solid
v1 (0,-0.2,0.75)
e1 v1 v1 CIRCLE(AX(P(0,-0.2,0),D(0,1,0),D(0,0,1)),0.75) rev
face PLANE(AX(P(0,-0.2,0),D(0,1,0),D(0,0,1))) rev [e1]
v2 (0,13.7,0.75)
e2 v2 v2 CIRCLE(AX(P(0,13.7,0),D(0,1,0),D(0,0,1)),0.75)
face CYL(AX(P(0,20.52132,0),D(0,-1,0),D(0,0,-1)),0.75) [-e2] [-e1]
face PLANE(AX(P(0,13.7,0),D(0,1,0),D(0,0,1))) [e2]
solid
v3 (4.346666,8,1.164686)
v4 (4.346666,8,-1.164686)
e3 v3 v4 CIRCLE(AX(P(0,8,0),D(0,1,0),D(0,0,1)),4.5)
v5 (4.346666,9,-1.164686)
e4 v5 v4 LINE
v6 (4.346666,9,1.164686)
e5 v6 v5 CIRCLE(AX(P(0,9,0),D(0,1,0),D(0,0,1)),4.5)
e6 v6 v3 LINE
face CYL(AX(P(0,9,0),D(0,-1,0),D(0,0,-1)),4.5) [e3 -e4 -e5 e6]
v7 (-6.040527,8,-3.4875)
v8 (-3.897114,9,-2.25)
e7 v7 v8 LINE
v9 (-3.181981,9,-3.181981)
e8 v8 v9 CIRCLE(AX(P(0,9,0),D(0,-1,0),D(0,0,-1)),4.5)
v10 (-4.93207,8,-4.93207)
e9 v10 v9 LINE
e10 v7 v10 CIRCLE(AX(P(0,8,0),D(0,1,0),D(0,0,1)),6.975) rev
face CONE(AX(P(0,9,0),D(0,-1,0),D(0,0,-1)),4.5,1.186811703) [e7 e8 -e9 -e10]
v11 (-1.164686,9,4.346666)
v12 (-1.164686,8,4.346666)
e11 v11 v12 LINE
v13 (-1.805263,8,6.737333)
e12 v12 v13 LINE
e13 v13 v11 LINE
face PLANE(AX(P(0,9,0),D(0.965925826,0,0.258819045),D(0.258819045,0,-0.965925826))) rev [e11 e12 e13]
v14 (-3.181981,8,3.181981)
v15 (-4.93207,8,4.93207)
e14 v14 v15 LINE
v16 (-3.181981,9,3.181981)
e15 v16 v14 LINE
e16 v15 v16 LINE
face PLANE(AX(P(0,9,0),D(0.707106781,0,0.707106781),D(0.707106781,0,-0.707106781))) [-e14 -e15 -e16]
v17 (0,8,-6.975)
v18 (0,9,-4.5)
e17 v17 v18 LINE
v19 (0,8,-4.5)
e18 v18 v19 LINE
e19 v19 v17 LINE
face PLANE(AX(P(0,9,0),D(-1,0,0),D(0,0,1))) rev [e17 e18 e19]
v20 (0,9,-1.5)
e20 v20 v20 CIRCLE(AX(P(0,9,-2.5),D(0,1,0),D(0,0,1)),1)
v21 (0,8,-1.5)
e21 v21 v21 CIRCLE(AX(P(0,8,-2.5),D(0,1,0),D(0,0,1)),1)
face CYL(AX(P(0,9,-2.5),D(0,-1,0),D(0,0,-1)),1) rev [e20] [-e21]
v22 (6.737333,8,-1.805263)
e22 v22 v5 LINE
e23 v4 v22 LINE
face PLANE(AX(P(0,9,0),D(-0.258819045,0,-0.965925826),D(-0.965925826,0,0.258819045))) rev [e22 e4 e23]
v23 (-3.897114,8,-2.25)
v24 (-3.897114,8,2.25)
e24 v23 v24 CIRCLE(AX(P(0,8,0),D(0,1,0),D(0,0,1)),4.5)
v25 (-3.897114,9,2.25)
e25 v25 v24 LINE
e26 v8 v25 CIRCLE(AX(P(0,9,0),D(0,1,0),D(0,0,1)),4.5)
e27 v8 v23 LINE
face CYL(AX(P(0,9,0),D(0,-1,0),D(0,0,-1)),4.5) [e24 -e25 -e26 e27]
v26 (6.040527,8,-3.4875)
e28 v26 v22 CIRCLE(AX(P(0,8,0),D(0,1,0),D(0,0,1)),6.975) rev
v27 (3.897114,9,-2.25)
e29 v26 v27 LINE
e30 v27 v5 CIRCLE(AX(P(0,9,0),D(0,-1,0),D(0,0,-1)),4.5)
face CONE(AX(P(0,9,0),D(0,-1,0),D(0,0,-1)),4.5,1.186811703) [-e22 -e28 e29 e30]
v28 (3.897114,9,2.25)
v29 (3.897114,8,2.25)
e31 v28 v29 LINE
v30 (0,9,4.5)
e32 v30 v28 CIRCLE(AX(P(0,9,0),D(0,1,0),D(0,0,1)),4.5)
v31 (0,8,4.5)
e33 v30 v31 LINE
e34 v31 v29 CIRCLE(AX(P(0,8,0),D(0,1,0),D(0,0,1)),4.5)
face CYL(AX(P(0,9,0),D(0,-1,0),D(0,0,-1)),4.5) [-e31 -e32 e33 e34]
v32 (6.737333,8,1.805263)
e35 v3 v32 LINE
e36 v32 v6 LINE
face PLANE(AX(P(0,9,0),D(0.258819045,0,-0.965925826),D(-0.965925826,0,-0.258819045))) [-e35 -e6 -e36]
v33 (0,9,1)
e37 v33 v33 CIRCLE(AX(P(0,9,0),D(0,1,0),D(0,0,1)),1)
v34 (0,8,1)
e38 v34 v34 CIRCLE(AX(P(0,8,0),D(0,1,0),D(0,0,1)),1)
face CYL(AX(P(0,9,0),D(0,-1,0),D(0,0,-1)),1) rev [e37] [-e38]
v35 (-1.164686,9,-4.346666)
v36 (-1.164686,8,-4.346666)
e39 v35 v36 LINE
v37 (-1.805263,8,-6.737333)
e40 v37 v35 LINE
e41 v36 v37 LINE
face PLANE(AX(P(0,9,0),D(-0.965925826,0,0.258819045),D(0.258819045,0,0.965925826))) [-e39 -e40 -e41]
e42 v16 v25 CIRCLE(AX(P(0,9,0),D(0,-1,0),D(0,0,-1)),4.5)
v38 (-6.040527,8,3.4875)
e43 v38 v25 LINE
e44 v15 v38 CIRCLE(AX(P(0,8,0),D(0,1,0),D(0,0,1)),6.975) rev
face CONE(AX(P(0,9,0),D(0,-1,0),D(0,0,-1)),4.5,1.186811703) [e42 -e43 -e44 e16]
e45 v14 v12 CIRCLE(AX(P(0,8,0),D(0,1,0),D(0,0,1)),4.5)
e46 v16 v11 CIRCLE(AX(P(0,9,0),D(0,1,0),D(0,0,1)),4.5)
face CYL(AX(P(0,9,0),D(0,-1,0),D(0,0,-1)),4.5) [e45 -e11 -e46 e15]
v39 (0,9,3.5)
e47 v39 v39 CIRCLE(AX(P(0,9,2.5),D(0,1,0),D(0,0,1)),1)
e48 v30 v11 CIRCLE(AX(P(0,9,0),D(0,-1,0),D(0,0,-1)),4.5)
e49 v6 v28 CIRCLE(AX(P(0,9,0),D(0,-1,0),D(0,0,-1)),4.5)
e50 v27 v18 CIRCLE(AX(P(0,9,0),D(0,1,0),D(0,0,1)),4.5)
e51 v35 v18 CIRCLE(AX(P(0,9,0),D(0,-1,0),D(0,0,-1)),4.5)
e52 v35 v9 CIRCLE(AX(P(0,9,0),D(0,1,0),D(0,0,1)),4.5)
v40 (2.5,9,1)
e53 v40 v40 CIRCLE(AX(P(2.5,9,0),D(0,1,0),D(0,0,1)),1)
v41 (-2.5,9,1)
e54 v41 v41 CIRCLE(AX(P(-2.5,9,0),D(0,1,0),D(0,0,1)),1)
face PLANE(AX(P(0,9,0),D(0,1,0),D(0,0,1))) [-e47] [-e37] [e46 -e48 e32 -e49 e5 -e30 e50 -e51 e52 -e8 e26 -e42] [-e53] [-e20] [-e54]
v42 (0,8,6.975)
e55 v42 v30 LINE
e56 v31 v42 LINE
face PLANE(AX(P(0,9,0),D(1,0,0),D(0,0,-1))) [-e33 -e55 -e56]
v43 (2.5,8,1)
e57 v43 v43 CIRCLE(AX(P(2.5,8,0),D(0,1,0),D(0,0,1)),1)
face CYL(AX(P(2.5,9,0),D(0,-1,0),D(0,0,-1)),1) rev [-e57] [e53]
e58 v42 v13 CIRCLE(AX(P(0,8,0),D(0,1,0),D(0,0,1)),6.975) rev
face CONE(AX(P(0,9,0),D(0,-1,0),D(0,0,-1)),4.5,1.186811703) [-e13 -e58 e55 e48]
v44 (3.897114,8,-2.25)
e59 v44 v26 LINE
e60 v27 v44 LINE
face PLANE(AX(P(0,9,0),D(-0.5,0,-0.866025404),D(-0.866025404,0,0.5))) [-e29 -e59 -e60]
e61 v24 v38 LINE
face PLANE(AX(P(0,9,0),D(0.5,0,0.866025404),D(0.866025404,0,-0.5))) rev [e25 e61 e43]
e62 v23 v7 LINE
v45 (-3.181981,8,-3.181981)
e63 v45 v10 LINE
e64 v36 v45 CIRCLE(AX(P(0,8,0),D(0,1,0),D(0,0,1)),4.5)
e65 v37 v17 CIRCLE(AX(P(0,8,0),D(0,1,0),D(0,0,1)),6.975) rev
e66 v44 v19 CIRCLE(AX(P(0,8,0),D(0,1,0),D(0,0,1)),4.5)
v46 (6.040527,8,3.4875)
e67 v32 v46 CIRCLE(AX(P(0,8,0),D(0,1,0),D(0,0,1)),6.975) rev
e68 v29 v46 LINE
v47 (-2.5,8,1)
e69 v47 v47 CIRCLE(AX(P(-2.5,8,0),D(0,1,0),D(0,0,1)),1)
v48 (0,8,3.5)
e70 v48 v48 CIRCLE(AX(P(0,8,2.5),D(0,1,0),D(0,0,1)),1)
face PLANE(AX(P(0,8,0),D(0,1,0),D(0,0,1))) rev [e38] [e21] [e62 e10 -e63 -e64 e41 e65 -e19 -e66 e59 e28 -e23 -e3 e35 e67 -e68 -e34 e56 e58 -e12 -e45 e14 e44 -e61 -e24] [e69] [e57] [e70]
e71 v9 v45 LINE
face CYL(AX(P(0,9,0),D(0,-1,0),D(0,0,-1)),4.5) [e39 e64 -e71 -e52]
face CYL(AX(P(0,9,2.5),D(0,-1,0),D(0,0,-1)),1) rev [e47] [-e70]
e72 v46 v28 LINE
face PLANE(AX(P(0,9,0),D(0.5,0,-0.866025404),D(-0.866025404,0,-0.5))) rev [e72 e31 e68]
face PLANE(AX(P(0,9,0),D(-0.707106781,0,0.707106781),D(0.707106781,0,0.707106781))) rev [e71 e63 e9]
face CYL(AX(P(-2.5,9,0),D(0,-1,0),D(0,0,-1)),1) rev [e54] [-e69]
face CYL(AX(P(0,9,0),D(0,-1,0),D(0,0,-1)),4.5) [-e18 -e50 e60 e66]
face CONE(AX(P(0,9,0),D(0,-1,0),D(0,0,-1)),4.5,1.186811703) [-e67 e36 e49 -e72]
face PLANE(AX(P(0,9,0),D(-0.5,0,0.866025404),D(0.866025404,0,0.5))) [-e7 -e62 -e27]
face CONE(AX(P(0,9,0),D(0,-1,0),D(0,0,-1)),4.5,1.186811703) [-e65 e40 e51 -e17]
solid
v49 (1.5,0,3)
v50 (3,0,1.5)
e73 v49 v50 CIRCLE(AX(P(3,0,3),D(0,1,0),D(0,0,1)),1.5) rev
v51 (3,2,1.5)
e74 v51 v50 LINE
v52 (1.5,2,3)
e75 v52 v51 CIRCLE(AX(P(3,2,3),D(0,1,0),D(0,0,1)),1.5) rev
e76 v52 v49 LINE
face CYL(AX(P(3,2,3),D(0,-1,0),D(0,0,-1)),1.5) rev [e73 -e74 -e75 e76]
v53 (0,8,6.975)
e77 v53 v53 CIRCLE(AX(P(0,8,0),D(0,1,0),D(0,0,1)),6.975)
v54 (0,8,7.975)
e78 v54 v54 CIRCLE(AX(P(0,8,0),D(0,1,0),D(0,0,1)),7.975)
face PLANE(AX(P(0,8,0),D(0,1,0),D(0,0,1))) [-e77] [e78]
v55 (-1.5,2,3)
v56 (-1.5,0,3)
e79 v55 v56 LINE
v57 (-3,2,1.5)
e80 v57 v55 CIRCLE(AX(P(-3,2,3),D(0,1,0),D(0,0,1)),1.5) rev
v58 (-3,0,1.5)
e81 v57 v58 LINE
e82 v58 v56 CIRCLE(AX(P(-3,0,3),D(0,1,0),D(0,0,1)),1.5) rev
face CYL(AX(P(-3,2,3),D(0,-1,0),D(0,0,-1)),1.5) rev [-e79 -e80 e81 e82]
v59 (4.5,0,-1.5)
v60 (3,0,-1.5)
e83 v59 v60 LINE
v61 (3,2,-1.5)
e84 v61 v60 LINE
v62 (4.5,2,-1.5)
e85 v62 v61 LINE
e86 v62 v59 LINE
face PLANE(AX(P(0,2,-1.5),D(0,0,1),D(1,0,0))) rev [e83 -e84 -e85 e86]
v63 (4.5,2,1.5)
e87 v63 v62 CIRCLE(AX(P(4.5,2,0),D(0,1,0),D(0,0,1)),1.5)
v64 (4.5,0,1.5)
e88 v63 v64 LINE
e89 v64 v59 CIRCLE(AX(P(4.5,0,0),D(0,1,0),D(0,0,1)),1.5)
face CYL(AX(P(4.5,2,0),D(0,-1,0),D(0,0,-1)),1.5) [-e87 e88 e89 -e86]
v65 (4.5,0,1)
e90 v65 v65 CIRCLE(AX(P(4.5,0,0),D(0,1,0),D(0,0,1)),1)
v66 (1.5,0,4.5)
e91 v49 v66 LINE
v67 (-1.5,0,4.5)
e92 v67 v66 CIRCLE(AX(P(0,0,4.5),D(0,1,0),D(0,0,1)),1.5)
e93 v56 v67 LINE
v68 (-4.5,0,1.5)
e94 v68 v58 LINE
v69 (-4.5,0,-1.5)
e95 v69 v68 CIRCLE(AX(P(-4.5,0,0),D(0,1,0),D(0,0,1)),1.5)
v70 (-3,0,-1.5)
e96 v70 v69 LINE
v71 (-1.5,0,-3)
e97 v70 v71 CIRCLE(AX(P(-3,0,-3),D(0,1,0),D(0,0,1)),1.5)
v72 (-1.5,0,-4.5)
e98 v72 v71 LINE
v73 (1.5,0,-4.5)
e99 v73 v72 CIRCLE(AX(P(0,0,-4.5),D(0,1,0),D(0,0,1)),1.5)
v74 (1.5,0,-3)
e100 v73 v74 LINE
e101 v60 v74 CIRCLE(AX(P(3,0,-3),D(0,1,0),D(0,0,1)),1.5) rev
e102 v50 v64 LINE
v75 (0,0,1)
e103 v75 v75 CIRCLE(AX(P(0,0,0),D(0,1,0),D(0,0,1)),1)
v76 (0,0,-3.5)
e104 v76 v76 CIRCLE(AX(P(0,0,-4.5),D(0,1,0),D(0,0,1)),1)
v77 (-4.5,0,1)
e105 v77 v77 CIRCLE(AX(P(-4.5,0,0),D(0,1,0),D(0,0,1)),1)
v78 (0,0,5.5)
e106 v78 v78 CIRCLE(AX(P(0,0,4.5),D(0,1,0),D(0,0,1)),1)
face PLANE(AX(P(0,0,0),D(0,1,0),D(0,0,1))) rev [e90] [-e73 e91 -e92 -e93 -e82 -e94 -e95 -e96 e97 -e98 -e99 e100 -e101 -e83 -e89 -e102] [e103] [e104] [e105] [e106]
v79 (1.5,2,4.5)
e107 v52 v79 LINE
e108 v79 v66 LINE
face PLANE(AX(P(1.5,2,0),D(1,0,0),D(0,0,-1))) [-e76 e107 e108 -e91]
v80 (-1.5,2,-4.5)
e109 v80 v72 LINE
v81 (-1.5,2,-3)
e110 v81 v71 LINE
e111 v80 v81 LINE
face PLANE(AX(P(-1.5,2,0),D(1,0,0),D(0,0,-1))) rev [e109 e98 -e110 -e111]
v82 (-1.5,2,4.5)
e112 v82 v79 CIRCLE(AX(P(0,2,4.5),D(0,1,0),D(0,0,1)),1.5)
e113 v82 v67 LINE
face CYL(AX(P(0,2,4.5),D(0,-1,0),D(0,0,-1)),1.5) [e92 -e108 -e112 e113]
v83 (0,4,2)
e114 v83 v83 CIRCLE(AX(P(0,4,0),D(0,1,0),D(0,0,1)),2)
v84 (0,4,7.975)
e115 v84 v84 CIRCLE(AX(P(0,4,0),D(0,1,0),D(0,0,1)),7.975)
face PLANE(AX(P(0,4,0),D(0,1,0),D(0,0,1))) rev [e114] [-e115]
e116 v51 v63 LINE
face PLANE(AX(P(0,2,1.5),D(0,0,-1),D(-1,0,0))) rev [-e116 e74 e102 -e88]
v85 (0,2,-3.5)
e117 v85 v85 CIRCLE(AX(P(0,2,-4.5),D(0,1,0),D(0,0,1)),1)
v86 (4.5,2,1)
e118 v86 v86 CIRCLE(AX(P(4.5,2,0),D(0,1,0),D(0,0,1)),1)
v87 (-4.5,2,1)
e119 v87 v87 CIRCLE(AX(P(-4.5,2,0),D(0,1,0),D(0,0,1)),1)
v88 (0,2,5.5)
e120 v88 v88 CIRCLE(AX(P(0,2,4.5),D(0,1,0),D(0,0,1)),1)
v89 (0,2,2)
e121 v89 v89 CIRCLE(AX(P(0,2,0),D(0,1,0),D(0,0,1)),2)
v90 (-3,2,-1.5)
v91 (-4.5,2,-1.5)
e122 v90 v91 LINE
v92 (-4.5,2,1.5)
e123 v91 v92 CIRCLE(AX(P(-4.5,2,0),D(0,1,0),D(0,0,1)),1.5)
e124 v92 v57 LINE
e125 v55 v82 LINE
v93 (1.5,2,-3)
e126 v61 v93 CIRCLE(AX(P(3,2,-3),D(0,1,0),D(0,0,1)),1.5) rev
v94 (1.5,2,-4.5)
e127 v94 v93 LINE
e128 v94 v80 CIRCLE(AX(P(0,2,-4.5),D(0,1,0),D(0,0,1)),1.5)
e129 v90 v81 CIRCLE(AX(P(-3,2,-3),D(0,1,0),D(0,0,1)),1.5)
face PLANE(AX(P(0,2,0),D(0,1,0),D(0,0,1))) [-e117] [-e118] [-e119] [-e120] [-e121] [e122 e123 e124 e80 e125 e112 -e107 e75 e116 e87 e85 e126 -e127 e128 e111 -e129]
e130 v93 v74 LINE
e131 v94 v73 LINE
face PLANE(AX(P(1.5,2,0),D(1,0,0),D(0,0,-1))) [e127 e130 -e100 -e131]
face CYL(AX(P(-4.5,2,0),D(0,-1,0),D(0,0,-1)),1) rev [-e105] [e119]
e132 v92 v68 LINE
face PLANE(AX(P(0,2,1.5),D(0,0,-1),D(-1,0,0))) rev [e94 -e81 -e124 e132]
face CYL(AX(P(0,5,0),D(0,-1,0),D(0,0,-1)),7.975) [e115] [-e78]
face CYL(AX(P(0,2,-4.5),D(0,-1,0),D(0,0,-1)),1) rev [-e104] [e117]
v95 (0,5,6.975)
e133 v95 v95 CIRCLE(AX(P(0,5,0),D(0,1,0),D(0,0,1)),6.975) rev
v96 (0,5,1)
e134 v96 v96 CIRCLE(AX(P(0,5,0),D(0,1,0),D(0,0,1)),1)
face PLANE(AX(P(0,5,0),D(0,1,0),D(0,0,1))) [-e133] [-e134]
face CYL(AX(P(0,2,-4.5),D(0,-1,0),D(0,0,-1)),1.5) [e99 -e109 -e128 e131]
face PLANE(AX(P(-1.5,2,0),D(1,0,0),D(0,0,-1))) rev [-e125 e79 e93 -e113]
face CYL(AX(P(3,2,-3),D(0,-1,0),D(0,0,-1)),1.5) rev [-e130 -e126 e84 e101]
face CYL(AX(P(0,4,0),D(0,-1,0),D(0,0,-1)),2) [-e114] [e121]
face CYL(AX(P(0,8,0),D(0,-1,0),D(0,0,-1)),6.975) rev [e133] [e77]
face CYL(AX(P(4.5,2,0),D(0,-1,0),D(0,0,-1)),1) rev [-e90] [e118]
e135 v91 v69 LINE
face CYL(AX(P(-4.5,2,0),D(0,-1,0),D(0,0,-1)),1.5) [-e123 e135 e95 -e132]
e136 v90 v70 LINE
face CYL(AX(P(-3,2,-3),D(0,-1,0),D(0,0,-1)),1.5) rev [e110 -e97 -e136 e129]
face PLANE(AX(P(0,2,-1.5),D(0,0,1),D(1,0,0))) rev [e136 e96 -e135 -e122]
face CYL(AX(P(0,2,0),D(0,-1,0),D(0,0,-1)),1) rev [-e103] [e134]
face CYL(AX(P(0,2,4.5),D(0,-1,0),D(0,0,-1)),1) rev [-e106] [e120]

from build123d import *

# Parameters (mm, degrees)
EXTRUDE_1_OUTLINE_R  = 1
EXTRUDE_1_DEPTH      = 2
SKETCH_3_R           = 2
SKETCH_3_R_2         = 1
EXTRUDE_2_DEPTH      = 2
SKETCH_4_R           = 7.975
SKETCH_4_R_2         = 6.975
EXTRUDE_3_DEPTH      = 4
SKETCH_5_R           = 1
EXTRUDE_4_DEPTH      = 1
SKETCH_11_R          = 7.975
SKETCH_11_R_2        = 1
EXTRUDE_5_DEPTH      = 1
EXTRUDE_6_DEPTH      = 13.7
EXTRUDE_6_DEPTH_BACK = 0.2
SKETCH_1_5_R         = 0.75


# Read off the part's stored shape, not the designer's step: 凸台-拉伸1
with BuildPart() as part:
    # 凸台-拉伸1 outline → 凸台-拉伸1 (new body)
    with BuildSketch(Plane(origin=(0, 0, 0), x_dir=(1, 0, 0), z_dir=(0, 1, 0))):
        with BuildLine():
            Line((-3, 1.5), (-4.5, 1.5))
            ThreePointArc((-4.5, 1.5), (-6, 0), (-4.5, -1.5))
            Line((-4.5, -1.5), (-3, -1.5))
            ThreePointArc((-3, -1.5), (-1.939339828, -1.939339828), (-1.5, -3))
            Line((-1.5, -3), (-1.5, -4.5))
            ThreePointArc((-1.5, -4.5), (0, -6), (1.5, -4.5))
            Line((1.5, -4.5), (1.5, -3))
            ThreePointArc((1.5, -3), (1.939339828, -1.939339828), (3, -1.5))
            Line((3, -1.5), (4.5, -1.5))
            ThreePointArc((4.5, -1.5), (6, 0), (4.5, 1.5))
            Line((4.5, 1.5), (3, 1.5))
            ThreePointArc((3, 1.5), (1.939339828, 1.939339828), (1.5, 3))
            Line((1.5, 3), (1.5, 4.5))
            ThreePointArc((1.5, 4.5), (0, 6), (-1.5, 4.5))
            Line((-1.5, 4.5), (-1.5, 3))
            ThreePointArc((-1.5, 3), (-1.939339828, 1.939339828), (-3, 1.5))
        make_face()
        with Locations((0, -4.5)):
            Circle(EXTRUDE_1_OUTLINE_R, mode=Mode.SUBTRACT)
        with Locations((-4.5, 0)):
            Circle(EXTRUDE_1_OUTLINE_R, mode=Mode.SUBTRACT)
        Circle(EXTRUDE_1_OUTLINE_R, mode=Mode.SUBTRACT)
        with Locations((4.5, 0)):
            Circle(EXTRUDE_1_OUTLINE_R, mode=Mode.SUBTRACT)
        with Locations((0, 4.5)):
            Circle(EXTRUDE_1_OUTLINE_R, mode=Mode.SUBTRACT)
    extrude(amount=EXTRUDE_1_DEPTH)

    # 草图3 → 凸台-拉伸2 (add)
    with BuildSketch(Plane(origin=(0, 2, 0), x_dir=(1, 0, 0), z_dir=(0, 1, 0))):
        with Locations(Location((0, 0, 0), (0, 0, 270))):
            Circle(SKETCH_3_R)
        with Locations(Location((0, 0, 0), (0, 0, 270))):
            Circle(SKETCH_3_R_2, mode=Mode.SUBTRACT)
    extrude(amount=EXTRUDE_2_DEPTH)



with BuildPart() as body_2:
    # 草图4 → 凸台-拉伸3 (new body)
    with BuildSketch(Plane(origin=(0, 4, 0), x_dir=(1, 0, 0), z_dir=(0, 1, 0))):
        with Locations(Location((0, 0, 0), (0, 0, 270))):
            Circle(SKETCH_4_R)
        with Locations(Location((0, 0, 0), (0, 0, 270))):
            Circle(SKETCH_4_R_2, mode=Mode.SUBTRACT)
    extrude(amount=EXTRUDE_3_DEPTH)


with BuildPart() as body_3:
    # 草图5 → 凸台-拉伸4 (new body)
    with BuildSketch(Plane(origin=(0, 8, 0), x_dir=(1, 0, 0), z_dir=(0, 1, 0))):
        with BuildLine():
            Line((6.737332638, -1.80526284), (4.346666218, -1.164685703))
            ThreePointArc((4.346666218, -1.164685703), (4.5, 0), (4.346666218, 1.164685703))
            Line((4.346666218, 1.164685703), (6.737332638, 1.80526284))
            ThreePointArc((6.737332638, 1.80526284), (6.444059739, 2.669216941), (6.040527191, 3.4875))
            Line((6.040527191, 3.4875), (3.897114317, 2.25))
            ThreePointArc((3.897114317, 2.25), (2.25, 3.897114317), (0, 4.5))
            Line((0, 4.5), (0, 6.975))
            ThreePointArc((0, 6.975), (-0.910420191, 6.915327908), (-1.80526284, 6.737332638))
            Line((-1.80526284, 6.737332638), (-1.164685703, 4.346666218))
            ThreePointArc((-1.164685703, 4.346666218), (-2.25, 3.897114317), (-3.181980515, 3.181980515))
            Line((-3.181980515, 3.181980515), (-4.932069799, 4.932069799))
            ThreePointArc((-4.932069799, 4.932069799), (-5.533639549, 4.246110967), (-6.040527191, 3.4875))
            Line((-6.040527191, 3.4875), (-3.897114317, 2.25))
            ThreePointArc((-3.897114317, 2.25), (-4.5, 0), (-3.897114317, -2.25))
            Line((-3.897114317, -2.25), (-6.040527191, -3.4875))
            ThreePointArc((-6.040527191, -3.4875), (-5.533639549, -4.246110967), (-4.932069799, -4.932069799))
            Line((-4.932069799, -4.932069799), (-3.181980515, -3.181980515))
            ThreePointArc((-3.181980515, -3.181980515), (-2.25, -3.897114317), (-1.164685703, -4.346666218))
            Line((-1.164685703, -4.346666218), (-1.80526284, -6.737332638))
            ThreePointArc((-1.80526284, -6.737332638), (-0.910420191, -6.915327908), (0, -6.975))
            Line((0, -6.975), (0, -4.5))
            ThreePointArc((0, -4.5), (2.25, -3.897114317), (3.897114317, -2.25))
            Line((3.897114317, -2.25), (6.040527191, -3.4875))
            ThreePointArc((6.040527191, -3.4875), (6.444059739, -2.669216941), (6.737332638, -1.80526284))
        make_face()
        with Locations(Location((0, 2.5, 0), (0, 0, 270))):
            Circle(SKETCH_5_R, mode=Mode.SUBTRACT)
        with Locations(Location((0, -2.5, 0), (0, 0, 270))):
            Circle(SKETCH_5_R, mode=Mode.SUBTRACT)
        with Locations(Location((-2.5, 0, 0), (0, 0, 270))):
            Circle(SKETCH_5_R, mode=Mode.SUBTRACT)
        with Locations(Location((0, 0, 0), (0, 0, 270))):
            Circle(SKETCH_5_R, mode=Mode.SUBTRACT)
        with Locations(Location((2.5, 0, 0), (0, 0, 270))):
            Circle(SKETCH_5_R, mode=Mode.SUBTRACT)
    extrude(amount=EXTRUDE_4_DEPTH)

    # 草图7 → 切除-旋转2 (revolve, cut)
    with BuildSketch(Plane(origin=(0, 0, 0), x_dir=(0.8660254037844349, 0, 0.5000000000000067), z_dir=(-0.5000000000000066, 0, 0.8660254037844348)), mode=Mode.PRIVATE) as cut_revolve_2_sk:
        Polygon((-4.5, 9), (-6.975, 8), (-6.975, 9), align=None)
    revolve(cut_revolve_2_sk.sketch.rotate(Axis((0, 0, 0), (0, 1, 0)), 120), axis=Axis((0, 0, 0), (0, 1, 0)), mode=Mode.SUBTRACT)


with BuildPart() as part_1:
    add(part.part)

    add(body_2.part)  # 凸台-拉伸5 merges body 2
    # 草图11 → 凸台-拉伸5 (add)
    with BuildSketch(Plane(origin=(0, 4, 0), x_dir=(1, 0, 0), z_dir=(0, 1, 0))):
        with Locations(Location((0, 0, 0), (0, 0, 270))):
            Circle(SKETCH_11_R)
        with Locations(Location((0, 0, 0), (0, 0, 270))):
            Circle(SKETCH_11_R_2, mode=Mode.SUBTRACT)
    extrude(amount=EXTRUDE_5_DEPTH)


with BuildPart() as body_3_2:
    # 草图1<5> → 凸台-拉伸6 (new, two sides: drawn at the far end of the back side and taken through both)
    with BuildSketch(Plane(origin=(0, 0, 0), x_dir=(1, 0, 0), z_dir=(0, 1, 0)).offset(-EXTRUDE_6_DEPTH_BACK)):
        with Locations(Location((0, 0, 0), (0, 0, 270))):
            Circle(SKETCH_1_5_R)
    extrude(amount=EXTRUDE_6_DEPTH + EXTRUDE_6_DEPTH_BACK)


solid = Compound([body_3.part, part_1.part, body_3_2.part])
